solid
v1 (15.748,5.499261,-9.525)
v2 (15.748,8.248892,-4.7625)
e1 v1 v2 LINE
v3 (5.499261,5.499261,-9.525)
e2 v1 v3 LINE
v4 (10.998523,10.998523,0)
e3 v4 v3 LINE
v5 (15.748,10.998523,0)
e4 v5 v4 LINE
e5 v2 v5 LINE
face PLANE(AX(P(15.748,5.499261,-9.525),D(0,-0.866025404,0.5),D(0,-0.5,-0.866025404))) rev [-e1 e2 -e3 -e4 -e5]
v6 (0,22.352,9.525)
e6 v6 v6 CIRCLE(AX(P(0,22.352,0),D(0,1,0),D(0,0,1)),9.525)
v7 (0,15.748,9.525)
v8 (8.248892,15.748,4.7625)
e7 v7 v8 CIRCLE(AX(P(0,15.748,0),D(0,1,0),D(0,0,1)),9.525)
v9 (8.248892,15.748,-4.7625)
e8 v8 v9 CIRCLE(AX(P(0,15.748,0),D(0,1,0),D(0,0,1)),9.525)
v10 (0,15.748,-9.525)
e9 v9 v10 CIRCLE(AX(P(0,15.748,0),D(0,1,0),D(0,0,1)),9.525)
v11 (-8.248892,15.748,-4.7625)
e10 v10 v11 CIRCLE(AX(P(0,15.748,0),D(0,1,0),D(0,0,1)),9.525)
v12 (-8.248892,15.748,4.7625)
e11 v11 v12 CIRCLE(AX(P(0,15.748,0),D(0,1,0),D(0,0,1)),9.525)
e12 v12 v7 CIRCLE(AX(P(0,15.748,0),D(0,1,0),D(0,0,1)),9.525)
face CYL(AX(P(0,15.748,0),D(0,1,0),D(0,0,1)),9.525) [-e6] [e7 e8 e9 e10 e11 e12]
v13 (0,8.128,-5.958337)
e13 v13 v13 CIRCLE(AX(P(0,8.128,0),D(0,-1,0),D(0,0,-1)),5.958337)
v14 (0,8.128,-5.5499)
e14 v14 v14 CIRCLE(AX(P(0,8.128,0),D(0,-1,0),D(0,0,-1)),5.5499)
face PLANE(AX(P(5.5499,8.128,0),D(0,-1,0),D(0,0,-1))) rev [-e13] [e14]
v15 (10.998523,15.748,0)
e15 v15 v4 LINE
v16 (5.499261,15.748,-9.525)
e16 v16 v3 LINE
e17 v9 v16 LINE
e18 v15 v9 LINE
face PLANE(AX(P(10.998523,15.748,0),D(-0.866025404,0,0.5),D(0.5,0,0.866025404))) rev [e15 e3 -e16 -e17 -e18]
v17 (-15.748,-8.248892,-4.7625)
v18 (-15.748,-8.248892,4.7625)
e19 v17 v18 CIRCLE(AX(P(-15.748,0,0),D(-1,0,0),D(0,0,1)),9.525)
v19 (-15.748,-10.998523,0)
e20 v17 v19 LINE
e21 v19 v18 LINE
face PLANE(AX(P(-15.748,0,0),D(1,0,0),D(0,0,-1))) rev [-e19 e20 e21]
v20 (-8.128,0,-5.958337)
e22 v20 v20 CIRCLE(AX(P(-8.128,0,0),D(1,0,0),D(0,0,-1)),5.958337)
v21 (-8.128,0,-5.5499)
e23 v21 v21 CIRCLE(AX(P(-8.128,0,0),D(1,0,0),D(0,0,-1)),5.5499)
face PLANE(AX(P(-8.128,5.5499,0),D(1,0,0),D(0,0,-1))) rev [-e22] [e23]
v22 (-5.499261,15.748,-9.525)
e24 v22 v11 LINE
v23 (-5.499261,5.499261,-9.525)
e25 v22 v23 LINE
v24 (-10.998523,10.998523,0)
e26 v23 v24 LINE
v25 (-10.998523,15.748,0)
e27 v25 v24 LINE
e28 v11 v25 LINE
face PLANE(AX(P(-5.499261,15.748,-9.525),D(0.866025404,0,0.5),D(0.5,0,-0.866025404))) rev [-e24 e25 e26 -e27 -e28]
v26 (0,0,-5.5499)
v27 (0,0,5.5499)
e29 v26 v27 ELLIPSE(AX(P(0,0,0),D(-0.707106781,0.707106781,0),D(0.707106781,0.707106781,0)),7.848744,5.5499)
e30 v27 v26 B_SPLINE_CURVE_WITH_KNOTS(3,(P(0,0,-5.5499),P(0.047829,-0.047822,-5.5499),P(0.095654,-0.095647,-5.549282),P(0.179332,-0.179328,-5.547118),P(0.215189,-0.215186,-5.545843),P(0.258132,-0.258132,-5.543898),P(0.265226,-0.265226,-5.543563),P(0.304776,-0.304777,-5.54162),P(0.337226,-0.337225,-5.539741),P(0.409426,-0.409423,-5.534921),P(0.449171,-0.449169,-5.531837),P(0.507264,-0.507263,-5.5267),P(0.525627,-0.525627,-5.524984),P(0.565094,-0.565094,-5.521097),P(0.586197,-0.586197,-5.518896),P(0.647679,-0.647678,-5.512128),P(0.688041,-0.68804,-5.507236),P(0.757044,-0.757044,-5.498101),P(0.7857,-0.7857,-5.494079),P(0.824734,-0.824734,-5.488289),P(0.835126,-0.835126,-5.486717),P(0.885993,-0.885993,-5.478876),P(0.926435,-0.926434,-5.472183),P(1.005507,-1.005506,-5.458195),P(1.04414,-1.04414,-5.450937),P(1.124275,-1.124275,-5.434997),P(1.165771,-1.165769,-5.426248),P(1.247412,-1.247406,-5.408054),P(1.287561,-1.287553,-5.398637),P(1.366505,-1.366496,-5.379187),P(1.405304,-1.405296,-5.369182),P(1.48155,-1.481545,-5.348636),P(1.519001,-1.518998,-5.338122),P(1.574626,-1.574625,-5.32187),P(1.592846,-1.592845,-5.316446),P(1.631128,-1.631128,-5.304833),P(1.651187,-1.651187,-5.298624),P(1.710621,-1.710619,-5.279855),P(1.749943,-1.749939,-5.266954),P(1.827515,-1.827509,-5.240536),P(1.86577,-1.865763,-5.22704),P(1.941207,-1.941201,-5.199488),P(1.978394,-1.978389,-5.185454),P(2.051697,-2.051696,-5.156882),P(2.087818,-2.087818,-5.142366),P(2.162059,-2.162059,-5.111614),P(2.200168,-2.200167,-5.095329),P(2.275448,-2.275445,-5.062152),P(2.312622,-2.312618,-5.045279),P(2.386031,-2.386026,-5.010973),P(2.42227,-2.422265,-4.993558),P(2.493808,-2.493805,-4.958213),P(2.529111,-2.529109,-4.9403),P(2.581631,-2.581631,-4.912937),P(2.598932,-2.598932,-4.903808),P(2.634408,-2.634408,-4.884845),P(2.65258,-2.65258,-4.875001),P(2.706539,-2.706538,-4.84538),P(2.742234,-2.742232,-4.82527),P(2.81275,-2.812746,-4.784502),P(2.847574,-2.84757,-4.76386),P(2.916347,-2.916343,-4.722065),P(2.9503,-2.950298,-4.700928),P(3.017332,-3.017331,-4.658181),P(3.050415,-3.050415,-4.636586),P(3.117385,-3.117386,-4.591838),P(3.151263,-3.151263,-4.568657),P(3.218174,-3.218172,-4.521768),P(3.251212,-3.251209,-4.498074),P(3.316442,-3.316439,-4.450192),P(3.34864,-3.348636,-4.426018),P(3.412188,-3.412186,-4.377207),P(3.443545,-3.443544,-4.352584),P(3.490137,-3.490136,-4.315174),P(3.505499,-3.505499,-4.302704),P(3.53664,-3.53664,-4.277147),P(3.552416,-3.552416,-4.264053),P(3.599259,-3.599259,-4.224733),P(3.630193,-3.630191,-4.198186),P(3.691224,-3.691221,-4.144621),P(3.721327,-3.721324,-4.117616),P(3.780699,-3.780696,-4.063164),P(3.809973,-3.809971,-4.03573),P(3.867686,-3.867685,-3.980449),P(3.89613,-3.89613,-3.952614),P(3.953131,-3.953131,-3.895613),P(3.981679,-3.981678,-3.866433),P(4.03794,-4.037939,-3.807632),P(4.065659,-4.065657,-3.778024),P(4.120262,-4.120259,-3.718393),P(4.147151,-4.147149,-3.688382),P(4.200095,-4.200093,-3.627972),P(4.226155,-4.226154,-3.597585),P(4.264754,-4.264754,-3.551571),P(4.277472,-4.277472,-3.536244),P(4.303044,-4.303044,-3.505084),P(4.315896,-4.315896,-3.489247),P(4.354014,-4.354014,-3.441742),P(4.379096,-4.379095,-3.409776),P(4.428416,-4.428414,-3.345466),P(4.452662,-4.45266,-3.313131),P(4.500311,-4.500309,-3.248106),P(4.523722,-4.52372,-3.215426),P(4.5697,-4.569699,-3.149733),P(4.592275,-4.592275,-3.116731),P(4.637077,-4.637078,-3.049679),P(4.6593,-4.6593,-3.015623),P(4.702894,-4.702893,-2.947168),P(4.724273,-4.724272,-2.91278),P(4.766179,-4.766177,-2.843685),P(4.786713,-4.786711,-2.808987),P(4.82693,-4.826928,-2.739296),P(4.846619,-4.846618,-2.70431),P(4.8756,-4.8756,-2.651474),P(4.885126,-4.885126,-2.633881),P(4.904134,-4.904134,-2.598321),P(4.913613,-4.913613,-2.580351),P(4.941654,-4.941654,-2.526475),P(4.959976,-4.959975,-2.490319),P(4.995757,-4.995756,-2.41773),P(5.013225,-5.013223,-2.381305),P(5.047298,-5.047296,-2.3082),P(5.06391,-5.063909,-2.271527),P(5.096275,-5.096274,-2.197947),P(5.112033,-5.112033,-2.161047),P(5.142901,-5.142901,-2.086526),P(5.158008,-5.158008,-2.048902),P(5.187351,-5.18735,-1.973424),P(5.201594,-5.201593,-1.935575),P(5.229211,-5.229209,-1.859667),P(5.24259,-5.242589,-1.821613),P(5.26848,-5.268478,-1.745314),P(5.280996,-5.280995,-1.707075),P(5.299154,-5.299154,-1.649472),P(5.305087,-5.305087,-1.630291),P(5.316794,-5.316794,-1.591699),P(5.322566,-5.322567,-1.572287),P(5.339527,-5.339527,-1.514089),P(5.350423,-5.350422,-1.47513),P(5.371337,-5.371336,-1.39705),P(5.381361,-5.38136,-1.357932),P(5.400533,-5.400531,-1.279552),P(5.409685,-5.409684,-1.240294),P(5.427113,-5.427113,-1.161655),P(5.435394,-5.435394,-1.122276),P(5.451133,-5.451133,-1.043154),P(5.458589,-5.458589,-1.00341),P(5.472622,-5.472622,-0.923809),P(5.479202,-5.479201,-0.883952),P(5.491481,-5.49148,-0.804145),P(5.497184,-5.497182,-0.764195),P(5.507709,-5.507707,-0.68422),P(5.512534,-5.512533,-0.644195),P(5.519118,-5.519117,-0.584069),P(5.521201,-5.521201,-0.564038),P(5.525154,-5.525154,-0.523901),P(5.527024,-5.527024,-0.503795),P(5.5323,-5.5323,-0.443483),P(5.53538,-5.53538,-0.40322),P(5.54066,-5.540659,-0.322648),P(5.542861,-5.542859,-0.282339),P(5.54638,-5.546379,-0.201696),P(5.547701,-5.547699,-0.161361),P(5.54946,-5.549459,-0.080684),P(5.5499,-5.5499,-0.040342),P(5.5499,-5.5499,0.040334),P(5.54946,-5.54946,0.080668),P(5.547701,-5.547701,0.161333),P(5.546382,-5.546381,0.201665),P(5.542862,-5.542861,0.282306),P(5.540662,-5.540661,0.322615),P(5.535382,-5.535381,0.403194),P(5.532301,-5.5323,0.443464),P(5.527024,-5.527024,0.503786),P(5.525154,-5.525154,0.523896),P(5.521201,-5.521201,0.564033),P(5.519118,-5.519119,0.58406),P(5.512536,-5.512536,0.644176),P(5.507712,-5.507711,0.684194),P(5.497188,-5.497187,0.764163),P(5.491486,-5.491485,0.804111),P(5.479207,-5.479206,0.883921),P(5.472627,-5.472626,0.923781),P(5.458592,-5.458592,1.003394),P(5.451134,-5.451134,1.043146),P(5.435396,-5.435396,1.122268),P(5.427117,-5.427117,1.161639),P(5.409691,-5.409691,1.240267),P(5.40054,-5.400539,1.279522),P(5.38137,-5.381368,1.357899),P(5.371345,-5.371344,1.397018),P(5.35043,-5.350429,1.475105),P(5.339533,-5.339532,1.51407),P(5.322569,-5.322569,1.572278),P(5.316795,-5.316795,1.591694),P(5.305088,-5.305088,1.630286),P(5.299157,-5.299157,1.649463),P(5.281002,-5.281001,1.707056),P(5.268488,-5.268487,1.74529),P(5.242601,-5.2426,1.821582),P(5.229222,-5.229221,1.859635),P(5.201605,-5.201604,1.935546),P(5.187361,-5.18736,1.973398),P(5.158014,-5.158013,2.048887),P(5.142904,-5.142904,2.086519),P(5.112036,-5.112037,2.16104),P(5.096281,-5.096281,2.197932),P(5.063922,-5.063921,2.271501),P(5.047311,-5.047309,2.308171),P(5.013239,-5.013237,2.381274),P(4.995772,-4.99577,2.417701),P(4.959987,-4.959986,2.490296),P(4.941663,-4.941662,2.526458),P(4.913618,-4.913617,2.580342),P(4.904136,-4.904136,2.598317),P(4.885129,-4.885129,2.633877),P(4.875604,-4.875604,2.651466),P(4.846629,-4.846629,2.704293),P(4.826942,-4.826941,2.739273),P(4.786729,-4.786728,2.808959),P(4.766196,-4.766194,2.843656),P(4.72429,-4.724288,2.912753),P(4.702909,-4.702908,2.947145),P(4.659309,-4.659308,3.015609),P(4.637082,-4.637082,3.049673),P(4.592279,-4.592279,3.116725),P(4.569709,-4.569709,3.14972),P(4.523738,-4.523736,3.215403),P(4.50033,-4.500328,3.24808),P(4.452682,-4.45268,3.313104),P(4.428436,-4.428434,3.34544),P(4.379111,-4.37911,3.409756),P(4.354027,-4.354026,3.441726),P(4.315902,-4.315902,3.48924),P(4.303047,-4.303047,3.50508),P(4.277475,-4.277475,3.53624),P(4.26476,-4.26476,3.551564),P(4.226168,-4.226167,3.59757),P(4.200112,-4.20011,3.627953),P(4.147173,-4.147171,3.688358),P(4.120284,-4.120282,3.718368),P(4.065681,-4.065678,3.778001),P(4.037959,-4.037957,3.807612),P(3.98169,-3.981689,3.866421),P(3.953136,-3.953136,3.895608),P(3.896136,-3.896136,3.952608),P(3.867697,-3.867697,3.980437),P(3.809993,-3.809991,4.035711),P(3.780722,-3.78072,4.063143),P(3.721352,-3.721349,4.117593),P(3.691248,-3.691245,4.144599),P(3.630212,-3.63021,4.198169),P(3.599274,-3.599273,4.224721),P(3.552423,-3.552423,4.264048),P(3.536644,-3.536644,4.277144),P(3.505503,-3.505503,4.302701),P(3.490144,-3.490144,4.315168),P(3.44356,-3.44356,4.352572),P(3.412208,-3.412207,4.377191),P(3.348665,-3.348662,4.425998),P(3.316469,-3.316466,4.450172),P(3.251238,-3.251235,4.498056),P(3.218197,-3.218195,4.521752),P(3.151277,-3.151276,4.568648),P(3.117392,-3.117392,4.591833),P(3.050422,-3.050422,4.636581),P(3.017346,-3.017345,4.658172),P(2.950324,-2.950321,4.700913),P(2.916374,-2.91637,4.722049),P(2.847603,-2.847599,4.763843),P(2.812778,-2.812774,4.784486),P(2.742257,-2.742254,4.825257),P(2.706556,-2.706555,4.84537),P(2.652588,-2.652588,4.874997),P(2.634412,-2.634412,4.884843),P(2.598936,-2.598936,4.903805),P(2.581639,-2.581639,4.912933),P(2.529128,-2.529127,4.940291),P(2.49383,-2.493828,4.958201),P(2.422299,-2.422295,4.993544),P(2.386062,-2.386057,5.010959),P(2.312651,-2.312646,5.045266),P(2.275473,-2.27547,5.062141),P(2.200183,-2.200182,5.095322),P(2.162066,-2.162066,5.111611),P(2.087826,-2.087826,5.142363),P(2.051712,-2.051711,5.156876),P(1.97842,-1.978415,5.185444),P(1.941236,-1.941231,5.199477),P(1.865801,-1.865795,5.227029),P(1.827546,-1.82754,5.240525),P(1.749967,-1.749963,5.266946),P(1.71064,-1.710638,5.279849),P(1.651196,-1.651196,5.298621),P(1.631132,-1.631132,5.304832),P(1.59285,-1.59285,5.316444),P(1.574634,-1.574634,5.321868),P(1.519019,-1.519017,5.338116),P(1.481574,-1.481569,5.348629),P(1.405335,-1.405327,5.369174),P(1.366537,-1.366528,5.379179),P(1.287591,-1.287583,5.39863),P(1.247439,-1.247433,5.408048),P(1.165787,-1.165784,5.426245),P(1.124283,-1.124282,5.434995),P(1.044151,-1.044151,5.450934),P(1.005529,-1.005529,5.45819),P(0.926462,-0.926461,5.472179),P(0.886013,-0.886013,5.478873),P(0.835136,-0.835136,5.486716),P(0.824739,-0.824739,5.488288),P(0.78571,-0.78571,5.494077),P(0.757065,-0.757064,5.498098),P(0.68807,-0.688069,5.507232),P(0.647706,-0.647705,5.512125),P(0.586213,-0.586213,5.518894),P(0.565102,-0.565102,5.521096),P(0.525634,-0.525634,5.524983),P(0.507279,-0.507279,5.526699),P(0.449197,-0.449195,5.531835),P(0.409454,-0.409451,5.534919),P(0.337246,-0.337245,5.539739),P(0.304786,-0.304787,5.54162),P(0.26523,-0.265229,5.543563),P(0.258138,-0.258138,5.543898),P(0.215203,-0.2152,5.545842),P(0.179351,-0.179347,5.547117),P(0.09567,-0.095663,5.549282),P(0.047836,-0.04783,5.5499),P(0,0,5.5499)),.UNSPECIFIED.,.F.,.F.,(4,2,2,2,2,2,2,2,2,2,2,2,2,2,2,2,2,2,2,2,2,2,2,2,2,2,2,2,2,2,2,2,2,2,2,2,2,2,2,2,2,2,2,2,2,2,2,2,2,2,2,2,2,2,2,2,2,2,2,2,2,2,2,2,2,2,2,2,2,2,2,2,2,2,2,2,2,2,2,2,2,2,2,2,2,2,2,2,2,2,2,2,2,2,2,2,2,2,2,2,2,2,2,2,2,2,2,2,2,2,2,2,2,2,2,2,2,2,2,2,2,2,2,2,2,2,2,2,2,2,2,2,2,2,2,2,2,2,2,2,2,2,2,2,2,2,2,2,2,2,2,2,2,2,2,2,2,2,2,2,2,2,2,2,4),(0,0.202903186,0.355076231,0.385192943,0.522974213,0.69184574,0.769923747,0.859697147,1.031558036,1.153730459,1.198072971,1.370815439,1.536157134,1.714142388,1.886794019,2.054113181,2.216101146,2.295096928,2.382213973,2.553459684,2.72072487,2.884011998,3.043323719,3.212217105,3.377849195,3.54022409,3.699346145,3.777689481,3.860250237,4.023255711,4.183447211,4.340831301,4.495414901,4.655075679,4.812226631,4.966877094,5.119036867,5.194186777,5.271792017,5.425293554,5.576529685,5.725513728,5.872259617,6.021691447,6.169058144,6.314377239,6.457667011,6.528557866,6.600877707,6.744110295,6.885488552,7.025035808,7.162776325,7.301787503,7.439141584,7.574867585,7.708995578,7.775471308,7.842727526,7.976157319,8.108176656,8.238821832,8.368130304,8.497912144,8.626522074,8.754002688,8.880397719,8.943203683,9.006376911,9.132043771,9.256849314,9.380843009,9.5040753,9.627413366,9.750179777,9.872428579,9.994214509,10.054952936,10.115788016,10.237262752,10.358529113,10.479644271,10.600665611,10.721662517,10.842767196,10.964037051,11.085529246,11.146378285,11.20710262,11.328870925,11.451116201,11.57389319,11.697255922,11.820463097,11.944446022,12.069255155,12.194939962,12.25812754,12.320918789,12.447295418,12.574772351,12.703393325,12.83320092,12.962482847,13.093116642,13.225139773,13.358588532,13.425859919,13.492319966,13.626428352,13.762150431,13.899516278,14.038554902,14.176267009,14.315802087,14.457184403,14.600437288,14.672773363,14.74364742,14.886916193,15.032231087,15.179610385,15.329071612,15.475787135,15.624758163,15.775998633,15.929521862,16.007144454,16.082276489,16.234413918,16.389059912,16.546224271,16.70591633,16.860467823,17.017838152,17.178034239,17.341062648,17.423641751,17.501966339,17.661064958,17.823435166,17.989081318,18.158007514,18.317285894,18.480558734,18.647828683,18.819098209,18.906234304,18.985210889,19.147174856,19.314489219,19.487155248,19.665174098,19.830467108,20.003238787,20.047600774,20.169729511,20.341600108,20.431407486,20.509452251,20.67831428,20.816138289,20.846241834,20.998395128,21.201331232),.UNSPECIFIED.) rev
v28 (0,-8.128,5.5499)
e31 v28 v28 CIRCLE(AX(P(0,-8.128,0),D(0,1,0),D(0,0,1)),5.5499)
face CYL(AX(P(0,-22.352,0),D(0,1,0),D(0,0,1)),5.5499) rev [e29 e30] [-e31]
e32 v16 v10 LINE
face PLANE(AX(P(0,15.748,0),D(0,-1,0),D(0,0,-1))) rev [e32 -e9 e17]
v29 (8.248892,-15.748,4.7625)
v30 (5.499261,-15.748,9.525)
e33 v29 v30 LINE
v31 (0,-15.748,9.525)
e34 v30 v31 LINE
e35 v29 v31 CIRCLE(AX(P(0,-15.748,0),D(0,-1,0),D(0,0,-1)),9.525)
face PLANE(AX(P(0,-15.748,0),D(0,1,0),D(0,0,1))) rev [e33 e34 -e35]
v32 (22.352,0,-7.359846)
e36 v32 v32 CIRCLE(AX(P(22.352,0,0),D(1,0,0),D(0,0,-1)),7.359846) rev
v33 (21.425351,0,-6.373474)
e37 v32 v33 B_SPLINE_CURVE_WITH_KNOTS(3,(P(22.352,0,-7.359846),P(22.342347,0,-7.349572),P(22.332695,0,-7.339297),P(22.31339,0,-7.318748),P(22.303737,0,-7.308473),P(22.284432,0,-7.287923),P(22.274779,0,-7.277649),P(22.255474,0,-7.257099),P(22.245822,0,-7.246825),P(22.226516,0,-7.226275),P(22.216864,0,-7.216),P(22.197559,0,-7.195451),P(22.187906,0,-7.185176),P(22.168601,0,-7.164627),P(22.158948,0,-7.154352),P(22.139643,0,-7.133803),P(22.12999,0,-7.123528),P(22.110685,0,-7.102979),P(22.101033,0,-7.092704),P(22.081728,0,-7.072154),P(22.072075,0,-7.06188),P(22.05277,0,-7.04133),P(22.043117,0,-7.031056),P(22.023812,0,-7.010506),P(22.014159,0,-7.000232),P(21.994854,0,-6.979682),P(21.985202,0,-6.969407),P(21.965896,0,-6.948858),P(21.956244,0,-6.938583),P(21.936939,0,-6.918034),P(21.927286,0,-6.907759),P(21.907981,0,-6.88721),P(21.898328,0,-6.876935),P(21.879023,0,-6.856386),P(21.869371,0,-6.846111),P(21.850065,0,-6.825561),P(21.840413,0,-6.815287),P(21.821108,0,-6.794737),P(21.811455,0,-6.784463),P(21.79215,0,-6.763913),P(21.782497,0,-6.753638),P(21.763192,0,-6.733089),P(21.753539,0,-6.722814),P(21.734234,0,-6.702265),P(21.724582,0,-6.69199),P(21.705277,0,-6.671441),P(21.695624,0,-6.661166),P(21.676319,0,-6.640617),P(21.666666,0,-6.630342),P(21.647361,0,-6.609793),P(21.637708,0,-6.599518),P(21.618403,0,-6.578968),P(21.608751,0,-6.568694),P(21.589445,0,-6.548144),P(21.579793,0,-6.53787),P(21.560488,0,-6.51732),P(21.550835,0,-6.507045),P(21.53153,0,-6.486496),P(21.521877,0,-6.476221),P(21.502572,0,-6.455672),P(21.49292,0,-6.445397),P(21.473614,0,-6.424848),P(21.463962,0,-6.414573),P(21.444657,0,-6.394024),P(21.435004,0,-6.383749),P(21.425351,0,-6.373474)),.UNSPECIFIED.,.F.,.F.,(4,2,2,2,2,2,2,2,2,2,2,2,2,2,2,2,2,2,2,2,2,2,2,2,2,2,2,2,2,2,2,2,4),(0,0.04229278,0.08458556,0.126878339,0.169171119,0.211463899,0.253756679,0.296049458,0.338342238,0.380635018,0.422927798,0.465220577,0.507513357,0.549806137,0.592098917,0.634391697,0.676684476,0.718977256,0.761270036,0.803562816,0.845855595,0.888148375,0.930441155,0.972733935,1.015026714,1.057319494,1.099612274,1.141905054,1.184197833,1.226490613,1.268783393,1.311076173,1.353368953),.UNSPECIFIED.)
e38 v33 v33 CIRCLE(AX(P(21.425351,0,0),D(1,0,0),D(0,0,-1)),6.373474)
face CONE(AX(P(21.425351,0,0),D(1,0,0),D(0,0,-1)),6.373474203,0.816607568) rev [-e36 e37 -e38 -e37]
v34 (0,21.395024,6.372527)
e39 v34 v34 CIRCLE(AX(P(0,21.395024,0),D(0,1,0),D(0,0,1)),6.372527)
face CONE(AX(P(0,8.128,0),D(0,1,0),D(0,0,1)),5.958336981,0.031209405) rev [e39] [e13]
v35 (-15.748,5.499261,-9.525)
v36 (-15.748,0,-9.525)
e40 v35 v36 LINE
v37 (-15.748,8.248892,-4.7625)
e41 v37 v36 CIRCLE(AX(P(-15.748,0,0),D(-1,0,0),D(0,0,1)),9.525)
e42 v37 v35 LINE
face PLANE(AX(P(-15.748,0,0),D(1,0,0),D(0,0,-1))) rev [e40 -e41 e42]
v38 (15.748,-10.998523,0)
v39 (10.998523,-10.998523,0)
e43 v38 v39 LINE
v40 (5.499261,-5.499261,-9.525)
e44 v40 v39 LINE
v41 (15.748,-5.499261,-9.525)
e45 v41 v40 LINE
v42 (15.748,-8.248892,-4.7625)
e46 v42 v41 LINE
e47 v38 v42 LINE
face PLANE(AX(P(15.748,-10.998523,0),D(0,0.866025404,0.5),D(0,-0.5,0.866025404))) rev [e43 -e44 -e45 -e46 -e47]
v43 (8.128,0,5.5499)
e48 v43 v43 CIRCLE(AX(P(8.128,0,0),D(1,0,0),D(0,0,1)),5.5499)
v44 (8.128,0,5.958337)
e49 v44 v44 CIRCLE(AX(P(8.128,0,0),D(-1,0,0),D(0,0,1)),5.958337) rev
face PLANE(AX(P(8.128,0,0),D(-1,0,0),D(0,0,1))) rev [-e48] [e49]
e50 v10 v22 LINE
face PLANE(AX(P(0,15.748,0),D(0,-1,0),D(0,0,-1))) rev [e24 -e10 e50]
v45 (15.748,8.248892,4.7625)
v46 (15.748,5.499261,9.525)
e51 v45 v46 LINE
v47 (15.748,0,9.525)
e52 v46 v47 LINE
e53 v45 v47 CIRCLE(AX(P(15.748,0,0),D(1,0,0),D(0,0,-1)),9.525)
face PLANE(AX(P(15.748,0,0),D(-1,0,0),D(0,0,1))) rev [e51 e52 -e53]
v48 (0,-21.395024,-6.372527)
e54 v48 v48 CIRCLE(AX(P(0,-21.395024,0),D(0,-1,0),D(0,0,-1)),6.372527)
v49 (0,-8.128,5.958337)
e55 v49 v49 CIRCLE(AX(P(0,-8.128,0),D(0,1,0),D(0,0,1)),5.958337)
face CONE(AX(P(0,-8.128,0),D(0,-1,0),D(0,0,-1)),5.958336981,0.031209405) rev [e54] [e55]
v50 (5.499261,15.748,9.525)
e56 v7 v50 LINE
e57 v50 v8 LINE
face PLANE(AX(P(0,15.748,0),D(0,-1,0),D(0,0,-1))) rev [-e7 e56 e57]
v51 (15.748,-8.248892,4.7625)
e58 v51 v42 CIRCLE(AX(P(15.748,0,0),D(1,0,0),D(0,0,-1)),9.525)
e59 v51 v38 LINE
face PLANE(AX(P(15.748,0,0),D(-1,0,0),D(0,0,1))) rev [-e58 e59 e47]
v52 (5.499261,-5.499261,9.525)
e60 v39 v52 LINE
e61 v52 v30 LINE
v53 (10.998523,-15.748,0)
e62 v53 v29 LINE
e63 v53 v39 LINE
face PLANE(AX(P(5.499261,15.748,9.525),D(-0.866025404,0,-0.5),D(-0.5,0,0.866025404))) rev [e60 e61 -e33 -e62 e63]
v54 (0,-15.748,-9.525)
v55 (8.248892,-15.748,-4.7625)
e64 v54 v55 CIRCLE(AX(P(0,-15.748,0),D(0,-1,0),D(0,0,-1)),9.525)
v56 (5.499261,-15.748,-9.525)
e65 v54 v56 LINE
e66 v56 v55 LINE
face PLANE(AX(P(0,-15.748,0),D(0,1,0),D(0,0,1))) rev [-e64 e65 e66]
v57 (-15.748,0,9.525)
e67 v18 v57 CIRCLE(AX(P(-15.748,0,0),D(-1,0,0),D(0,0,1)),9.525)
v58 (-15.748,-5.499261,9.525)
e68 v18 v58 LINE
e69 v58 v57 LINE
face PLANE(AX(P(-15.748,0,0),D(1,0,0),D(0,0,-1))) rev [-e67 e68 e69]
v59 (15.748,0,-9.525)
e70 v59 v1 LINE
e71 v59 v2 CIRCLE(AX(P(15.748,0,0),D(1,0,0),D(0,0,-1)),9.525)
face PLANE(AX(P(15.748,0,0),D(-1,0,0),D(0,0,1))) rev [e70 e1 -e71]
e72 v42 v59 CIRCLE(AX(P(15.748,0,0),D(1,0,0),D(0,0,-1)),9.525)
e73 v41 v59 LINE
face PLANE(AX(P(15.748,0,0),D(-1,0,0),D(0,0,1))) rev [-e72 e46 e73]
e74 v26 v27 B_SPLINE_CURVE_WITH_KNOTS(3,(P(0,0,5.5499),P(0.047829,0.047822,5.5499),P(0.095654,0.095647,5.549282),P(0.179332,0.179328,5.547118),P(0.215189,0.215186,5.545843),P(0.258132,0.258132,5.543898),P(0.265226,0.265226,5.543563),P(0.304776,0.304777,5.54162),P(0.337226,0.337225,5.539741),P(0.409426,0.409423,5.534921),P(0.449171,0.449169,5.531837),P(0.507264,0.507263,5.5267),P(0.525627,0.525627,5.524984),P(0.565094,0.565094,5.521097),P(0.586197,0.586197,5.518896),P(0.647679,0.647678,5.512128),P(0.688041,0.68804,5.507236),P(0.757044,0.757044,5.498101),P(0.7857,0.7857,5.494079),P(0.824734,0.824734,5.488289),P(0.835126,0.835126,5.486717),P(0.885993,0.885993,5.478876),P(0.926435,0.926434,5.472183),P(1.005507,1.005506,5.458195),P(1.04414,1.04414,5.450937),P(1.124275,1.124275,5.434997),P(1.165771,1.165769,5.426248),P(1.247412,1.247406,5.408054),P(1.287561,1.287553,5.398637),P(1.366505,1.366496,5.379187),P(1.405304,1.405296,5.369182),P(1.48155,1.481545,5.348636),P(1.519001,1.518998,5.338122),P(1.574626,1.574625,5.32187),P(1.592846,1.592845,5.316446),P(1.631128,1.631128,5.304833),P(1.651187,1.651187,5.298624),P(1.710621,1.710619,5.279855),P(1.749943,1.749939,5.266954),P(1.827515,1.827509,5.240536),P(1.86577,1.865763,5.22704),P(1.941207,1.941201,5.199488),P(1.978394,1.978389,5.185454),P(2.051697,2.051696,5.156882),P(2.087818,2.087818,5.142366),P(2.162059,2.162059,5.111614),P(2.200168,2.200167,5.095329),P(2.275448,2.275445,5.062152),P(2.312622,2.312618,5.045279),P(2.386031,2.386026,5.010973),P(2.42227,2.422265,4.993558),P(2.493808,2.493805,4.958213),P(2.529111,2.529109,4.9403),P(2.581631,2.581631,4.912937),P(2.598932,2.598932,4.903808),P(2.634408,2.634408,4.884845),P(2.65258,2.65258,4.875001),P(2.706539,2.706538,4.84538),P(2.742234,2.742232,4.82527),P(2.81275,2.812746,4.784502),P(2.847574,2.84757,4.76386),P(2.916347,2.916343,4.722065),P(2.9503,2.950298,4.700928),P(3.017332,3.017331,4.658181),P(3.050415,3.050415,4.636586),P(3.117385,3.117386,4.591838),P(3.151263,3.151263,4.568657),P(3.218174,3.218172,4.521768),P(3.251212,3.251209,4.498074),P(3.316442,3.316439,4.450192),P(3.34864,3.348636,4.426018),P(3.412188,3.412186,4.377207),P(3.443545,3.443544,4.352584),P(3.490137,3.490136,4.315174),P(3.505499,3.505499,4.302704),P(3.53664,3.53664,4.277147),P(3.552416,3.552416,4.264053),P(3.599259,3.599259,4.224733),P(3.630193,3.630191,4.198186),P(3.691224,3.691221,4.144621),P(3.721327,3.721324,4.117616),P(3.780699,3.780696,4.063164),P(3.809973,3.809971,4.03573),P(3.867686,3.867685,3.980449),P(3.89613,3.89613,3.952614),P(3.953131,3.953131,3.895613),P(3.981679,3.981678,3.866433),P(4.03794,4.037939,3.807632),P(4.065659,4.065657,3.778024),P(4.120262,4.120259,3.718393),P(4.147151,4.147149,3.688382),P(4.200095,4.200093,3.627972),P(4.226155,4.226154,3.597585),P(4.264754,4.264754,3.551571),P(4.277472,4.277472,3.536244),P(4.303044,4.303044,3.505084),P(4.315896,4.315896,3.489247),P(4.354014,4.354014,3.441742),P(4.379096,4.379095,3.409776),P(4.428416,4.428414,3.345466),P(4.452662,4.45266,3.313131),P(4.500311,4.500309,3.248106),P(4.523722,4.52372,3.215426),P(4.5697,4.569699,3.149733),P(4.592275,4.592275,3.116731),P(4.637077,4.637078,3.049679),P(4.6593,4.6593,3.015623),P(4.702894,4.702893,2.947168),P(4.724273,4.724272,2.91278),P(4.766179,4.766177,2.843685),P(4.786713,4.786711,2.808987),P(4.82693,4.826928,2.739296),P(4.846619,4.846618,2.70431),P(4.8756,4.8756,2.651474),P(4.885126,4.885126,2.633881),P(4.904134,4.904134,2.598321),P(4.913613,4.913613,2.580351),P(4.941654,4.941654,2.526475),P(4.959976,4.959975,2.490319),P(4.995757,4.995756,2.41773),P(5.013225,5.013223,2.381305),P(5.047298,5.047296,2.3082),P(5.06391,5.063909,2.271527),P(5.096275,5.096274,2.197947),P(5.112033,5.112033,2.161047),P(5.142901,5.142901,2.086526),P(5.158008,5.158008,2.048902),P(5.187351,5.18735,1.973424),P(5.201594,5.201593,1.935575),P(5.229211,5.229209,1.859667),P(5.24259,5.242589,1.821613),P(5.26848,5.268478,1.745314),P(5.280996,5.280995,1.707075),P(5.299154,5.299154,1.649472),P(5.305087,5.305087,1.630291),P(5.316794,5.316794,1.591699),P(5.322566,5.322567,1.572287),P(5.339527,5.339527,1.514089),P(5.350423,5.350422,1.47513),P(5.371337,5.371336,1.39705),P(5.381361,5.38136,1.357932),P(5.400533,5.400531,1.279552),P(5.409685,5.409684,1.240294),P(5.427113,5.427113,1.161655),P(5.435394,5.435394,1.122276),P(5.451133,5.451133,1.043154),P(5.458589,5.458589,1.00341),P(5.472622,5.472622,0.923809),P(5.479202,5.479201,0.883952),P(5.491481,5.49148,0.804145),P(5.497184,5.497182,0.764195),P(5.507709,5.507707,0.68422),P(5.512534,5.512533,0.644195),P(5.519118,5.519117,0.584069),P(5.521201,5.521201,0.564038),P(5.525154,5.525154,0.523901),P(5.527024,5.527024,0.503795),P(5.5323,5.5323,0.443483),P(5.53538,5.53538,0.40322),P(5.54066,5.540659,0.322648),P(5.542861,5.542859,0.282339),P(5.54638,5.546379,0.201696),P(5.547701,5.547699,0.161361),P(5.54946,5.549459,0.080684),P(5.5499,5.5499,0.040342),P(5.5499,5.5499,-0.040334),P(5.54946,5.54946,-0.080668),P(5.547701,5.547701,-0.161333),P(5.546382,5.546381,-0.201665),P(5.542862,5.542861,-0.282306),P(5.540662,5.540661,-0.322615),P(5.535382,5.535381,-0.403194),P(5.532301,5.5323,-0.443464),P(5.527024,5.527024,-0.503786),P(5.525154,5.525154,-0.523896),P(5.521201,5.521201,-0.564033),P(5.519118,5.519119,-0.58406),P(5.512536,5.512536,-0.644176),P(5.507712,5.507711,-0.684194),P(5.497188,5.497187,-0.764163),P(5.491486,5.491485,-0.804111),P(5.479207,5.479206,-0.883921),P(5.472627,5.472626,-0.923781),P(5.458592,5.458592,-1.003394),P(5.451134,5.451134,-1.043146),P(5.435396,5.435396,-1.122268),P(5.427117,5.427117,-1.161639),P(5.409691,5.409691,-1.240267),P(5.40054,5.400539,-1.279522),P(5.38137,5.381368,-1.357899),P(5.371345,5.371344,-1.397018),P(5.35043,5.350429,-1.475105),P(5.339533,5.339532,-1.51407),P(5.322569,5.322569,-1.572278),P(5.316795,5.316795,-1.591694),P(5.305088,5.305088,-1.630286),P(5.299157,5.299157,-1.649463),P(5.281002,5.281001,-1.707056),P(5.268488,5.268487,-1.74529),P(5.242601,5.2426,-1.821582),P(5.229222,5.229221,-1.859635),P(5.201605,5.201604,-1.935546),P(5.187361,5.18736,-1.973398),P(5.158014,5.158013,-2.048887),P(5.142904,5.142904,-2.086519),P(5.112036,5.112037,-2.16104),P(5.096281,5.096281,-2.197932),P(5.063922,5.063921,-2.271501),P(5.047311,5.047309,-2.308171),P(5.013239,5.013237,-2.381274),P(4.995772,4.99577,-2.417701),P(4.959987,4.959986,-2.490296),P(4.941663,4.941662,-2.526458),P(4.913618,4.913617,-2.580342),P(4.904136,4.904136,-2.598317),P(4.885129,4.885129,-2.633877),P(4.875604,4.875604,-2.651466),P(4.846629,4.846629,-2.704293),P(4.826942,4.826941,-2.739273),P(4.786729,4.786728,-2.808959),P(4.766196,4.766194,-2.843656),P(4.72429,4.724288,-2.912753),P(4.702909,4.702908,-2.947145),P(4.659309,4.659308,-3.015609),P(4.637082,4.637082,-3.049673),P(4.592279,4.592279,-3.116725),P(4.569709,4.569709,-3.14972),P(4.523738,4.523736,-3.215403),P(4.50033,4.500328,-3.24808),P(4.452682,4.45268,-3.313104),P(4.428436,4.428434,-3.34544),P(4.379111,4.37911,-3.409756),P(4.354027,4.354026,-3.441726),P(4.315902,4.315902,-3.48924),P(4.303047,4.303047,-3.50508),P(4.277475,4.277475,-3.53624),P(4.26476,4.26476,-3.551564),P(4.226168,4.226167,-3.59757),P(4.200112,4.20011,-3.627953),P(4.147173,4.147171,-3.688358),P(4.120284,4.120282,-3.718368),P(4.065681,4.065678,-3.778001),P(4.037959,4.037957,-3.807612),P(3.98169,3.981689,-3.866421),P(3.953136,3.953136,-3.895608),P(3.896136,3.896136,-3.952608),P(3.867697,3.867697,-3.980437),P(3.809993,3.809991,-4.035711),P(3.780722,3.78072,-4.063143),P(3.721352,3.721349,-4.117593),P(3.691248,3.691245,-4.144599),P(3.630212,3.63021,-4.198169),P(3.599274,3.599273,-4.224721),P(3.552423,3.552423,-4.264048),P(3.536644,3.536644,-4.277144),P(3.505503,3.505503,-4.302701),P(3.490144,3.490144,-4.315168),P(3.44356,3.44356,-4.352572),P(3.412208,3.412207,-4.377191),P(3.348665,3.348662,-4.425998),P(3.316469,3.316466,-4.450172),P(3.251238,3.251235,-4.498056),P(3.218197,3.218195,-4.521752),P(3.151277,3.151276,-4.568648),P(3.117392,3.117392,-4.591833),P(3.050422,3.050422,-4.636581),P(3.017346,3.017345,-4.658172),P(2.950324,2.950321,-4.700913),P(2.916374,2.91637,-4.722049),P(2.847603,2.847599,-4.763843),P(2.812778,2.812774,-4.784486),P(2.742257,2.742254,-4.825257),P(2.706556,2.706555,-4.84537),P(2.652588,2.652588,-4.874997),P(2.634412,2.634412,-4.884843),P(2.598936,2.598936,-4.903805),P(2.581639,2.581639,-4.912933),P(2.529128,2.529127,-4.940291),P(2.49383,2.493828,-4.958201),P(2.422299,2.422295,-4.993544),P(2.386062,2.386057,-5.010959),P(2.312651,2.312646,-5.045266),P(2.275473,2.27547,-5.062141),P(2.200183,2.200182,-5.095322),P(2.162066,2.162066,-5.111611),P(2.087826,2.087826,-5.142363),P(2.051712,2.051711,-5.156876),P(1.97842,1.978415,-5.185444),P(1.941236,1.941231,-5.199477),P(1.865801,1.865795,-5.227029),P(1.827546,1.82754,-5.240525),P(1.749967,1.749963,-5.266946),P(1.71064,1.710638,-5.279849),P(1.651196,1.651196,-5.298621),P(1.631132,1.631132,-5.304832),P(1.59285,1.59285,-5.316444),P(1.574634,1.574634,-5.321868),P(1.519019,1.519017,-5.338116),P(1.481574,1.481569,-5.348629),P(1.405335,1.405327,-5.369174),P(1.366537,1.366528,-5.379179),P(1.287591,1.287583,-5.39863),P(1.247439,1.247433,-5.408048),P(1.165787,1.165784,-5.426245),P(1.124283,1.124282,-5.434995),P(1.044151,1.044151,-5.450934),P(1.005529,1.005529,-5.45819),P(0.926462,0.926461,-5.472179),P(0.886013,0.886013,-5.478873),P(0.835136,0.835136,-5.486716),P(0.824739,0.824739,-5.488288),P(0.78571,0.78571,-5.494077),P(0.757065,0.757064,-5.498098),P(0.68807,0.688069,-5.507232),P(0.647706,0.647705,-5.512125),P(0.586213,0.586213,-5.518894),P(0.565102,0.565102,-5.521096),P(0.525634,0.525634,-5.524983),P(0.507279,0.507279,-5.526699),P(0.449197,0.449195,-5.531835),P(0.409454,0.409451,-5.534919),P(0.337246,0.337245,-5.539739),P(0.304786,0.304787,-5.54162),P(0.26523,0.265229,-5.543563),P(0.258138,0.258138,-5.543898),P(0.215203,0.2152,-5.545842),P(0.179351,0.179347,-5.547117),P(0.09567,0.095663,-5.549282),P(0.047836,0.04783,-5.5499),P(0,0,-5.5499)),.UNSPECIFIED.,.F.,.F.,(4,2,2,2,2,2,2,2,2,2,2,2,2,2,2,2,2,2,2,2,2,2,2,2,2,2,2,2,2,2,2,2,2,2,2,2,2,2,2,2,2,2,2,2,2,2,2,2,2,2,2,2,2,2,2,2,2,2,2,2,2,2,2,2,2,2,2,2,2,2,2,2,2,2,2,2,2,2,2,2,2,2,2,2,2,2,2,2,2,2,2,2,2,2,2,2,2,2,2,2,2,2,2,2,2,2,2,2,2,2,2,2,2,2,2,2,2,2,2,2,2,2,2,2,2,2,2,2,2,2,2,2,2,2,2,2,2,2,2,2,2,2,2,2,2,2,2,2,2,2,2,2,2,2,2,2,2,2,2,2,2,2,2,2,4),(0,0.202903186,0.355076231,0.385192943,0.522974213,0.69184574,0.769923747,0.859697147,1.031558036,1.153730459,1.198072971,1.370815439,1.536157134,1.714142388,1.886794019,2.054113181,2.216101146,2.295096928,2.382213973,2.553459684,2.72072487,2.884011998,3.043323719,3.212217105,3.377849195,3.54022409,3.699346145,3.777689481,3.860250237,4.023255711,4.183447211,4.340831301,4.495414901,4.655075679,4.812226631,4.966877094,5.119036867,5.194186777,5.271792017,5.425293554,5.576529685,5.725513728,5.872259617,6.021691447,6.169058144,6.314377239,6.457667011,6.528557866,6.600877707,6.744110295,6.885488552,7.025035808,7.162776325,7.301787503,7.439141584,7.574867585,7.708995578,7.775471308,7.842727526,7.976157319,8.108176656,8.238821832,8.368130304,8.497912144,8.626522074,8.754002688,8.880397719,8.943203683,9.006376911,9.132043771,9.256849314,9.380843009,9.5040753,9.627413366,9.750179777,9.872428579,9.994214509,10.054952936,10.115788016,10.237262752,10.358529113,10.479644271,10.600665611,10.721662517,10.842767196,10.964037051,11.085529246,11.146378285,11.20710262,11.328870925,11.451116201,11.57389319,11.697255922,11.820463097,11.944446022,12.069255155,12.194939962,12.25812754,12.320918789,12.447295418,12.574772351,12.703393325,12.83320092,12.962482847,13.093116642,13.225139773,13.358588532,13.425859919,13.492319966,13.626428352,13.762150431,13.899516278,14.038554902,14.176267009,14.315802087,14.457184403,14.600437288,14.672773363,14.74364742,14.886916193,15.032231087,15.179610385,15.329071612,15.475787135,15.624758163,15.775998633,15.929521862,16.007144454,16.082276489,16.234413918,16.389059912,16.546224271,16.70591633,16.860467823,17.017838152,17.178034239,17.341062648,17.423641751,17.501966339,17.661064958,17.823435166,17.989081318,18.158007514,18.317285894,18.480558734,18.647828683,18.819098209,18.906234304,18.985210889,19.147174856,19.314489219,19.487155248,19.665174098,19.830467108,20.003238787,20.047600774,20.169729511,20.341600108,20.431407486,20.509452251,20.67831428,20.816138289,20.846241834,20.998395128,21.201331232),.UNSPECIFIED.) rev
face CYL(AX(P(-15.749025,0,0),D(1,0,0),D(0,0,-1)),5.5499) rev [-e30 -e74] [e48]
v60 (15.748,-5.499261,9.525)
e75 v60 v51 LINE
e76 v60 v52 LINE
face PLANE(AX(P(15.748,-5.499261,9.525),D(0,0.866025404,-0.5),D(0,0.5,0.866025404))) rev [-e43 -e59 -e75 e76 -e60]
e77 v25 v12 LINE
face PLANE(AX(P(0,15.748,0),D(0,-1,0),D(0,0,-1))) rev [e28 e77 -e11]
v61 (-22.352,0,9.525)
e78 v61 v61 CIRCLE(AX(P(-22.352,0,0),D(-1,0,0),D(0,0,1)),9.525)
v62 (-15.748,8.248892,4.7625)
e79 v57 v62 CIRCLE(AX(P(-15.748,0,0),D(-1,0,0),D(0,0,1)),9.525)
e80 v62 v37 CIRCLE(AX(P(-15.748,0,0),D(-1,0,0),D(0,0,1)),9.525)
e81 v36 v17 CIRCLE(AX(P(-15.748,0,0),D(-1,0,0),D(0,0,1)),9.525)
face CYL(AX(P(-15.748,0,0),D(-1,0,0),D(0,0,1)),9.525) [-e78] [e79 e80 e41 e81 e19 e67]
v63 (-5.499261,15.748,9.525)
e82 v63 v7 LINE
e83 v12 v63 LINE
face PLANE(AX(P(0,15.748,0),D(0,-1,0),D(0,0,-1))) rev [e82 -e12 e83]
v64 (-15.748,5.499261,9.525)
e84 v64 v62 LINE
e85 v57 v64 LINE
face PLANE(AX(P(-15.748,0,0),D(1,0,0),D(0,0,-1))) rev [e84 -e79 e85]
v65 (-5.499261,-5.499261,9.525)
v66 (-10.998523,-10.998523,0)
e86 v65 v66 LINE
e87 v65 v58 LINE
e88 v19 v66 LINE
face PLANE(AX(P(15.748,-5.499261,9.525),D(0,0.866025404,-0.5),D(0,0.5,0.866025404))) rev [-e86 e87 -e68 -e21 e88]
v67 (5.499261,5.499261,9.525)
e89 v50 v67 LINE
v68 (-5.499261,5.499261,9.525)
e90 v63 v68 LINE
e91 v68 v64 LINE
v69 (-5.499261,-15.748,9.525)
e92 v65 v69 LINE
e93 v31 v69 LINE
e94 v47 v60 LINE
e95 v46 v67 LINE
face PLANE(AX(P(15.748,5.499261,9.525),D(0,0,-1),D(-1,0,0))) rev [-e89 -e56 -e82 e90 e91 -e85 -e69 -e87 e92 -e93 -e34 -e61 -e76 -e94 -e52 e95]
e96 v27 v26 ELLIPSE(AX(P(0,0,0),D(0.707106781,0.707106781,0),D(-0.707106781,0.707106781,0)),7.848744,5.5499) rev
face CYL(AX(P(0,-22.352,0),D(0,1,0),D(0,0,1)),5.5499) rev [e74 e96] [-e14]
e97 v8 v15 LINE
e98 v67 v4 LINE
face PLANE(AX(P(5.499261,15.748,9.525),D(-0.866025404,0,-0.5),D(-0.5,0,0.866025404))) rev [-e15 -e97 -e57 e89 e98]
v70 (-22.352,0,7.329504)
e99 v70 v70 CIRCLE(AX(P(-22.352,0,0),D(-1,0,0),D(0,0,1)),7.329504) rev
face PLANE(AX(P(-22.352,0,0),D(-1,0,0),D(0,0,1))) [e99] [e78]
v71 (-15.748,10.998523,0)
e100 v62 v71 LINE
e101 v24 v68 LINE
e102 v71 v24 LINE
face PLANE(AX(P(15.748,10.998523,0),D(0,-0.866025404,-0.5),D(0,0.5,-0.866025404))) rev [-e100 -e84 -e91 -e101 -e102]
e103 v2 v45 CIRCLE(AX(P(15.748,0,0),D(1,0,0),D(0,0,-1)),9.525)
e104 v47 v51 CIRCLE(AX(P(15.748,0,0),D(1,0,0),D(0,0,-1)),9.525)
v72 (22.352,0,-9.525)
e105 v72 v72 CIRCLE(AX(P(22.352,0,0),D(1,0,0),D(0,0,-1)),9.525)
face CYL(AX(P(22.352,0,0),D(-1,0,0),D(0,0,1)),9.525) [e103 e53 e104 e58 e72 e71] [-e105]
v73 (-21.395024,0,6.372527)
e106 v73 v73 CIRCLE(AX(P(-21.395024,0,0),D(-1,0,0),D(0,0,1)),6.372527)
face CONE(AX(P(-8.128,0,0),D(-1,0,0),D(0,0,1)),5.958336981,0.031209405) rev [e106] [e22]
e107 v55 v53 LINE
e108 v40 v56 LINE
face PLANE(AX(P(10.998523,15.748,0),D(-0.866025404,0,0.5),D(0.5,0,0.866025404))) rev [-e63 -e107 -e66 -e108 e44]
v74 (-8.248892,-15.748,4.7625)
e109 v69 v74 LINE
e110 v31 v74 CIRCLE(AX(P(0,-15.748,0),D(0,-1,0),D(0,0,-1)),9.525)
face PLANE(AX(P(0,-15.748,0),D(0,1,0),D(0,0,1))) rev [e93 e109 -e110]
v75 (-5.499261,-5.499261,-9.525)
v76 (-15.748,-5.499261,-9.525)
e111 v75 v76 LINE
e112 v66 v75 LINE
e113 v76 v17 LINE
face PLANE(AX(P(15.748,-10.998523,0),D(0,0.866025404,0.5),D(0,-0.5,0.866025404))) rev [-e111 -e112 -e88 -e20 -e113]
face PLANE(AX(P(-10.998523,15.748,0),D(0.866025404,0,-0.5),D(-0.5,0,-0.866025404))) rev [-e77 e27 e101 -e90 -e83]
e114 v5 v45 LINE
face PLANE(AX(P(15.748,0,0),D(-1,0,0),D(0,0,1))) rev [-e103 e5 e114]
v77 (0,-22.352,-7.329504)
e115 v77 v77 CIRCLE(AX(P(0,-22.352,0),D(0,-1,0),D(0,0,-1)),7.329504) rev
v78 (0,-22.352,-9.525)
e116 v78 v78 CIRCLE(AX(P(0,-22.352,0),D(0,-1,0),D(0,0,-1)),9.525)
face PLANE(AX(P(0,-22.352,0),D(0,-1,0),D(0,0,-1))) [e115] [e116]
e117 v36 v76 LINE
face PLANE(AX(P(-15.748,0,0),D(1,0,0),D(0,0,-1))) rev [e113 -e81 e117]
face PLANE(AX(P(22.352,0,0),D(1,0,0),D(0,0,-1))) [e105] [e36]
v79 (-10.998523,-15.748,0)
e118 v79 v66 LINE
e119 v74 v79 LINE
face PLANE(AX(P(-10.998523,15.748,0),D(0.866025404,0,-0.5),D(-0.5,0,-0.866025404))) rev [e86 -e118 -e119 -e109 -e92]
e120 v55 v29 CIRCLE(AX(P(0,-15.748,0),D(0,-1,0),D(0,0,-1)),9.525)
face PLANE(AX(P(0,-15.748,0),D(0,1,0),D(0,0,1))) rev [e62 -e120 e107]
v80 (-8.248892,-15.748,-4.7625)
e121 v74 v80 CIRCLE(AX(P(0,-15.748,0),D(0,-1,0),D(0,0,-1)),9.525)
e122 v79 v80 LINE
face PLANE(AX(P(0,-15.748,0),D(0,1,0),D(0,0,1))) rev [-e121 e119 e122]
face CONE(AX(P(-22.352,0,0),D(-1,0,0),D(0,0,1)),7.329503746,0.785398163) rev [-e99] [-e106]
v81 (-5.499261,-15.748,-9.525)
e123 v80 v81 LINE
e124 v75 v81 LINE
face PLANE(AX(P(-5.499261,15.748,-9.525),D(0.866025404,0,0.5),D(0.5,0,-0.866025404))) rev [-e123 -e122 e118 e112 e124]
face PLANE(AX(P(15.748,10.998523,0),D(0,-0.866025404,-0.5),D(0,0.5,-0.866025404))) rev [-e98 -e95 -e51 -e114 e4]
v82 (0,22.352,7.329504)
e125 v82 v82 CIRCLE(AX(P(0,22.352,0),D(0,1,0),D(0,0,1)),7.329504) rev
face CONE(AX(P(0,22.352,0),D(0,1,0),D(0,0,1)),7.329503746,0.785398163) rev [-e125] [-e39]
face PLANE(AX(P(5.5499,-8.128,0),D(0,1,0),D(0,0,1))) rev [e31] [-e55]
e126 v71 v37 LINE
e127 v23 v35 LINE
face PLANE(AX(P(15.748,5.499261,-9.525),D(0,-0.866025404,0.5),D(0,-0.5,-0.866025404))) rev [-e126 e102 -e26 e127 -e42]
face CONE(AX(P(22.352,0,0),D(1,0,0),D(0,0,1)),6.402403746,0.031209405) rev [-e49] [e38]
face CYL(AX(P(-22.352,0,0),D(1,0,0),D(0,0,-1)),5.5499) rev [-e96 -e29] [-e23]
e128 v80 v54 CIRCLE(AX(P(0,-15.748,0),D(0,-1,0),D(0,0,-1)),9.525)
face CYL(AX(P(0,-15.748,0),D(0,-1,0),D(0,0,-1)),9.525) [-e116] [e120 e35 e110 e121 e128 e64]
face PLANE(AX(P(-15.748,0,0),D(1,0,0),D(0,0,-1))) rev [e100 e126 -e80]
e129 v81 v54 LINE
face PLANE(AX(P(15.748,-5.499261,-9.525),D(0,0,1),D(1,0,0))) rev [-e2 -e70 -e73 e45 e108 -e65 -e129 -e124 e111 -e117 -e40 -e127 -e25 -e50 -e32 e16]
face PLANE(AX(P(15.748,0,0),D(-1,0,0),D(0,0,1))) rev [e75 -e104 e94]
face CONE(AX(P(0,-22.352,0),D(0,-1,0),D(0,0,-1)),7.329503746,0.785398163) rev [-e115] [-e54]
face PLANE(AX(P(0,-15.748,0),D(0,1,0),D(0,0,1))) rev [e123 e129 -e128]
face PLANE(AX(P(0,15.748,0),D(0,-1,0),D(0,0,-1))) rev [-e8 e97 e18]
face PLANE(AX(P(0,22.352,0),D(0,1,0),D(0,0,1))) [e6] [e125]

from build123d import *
from OCP.BRepFilletAPI import BRepFilletAPI_MakeChamfer

# Parameters (mm, degrees)
BOSS_EXTRUDE1_START     = -21.997045256
BOSS_EXTRUDE1_DEPTH     = 26.746522628
BOSS_EXTRUDE1_START_2   = -16.497783942
BOSS_EXTRUDE1_2_DEPTH   = 10.998522628
BOSS_EXTRUDE1_START_3   = -10.998522628
BOSS_EXTRUDE1_3_DEPTH   = 21.997045256
BOSS_EXTRUDE2_DEPTH     = 4.749477372
BOSS_EXTRUDE3_DEPTH     = 4.749477372
BOSS_EXTRUDE4_DEPTH     = 4.749477372
SKETCH5_R               = 9.525
BOSS_EXTRUDE5_DEPTH     = 6.604
SKETCH10_R              = 6.402403746
CUT_EXTRUDE2_DEPTH      = 14.224
CUT_EXTRUDE2_DRAFT      = -1.788167188
CUT_EXTRUDE3_REACH      = 32.146
CUT_EXTRUDE3_END_RADIUS = 5.5499
SKETCH11_R              = 5.5499
SKETCH12_W              = 6.604
SKETCH12_H              = 9.525
SKETCH13_W              = 9.525
SKETCH13_H              = 6.604
SKETCH14_W              = 9.525
SKETCH14_H              = 6.604
CHAMFER1_SIZE           = 0.9271
CHAMFER1_SIZE2          = 0.957442613


with BuildPart() as part:
    # Boss-Extrude1: read off the stored shape, not the designer's step
    # Boss-Extrude1 outline → Boss-Extrude1 (new body)
    with BuildSketch(Plane.ZY.offset(10.998522628).offset(BOSS_EXTRUDE1_START)):
        Polygon((-9.525, 5.499261314), (-9.525, -5.499261314), (0, -10.998522628), (9.525, -5.499261314), (9.525, 5.499261314), (0, 10.998522628), align=None)
    extrude(amount=BOSS_EXTRUDE1_DEPTH)

    # Boss-Extrude1 2 outline → Boss-Extrude1 2 (add)
    with BuildSketch(Plane.ZY.offset(10.998522628).offset(BOSS_EXTRUDE1_START_2)):
        Polygon((-9.525, -5.499261314), (-9.525, -10.998522628), (0, -10.998522628), align=None)
        Polygon((9.525, -5.499261314), (0, -10.998522628), (9.525, -10.998522628), align=None)
        Polygon((-9.525, 10.998522628), (-9.525, 5.499261314), (0, 10.998522628), align=None)
        Polygon((9.525, 10.998522628), (0, 10.998522628), (9.525, 5.499261314), align=None)
    extrude(amount=BOSS_EXTRUDE1_2_DEPTH)

    # Boss-Extrude1 3 outline → Boss-Extrude1 3 (add)
    with BuildSketch(Plane(origin=(0, 0, 0), x_dir=(1, 0, 0), z_dir=(0, 1, 0)).offset(BOSS_EXTRUDE1_START_3)):
        Polygon((10.998522628, 0), (5.499261314, 9.525), (5.499261314, -9.525), align=None)
        Polygon((-10.998522628, 0), (-5.499261314, -9.525), (-5.499261314, 9.525), align=None)
    extrude(amount=BOSS_EXTRUDE1_3_DEPTH)

    # Sketch2 → Boss-Extrude2 (add)
    with BuildSketch(Plane.XZ.offset(10.998522628)):
        Polygon((-5.499261314, -9.525), (-10.998522628, 0), (-5.499261314, 9.525), (5.499261314, 9.525), (10.998522628, 0), (5.499261314, -9.525), align=None)
    extrude(amount=BOSS_EXTRUDE2_DEPTH)

    # Sketch3 → Boss-Extrude3 (add)
    with BuildSketch(Plane(origin=(0, 10.998522628, 0), x_dir=(-1, 0, 0), z_dir=(0, 1, 0))):
        Polygon((-5.499261314, 9.525), (5.499261314, 9.525), (10.998522628, 0), (5.499261314, -9.525), (-5.499261314, -9.525), (-10.998522628, 0), align=None)
    extrude(amount=BOSS_EXTRUDE3_DEPTH)

    # Sketch4 → Boss-Extrude4 (add)
    with BuildSketch(Plane(origin=(10.998522628, 0, 0), x_dir=(0, 0, -1), z_dir=(1, 0, 0))):
        Polygon((0, 10.998522628), (9.525, 5.499261314), (9.525, -5.499261314), (0, -10.998522628), (-9.525, -5.499261314), (-9.525, 5.499261314), align=None)
    extrude(amount=BOSS_EXTRUDE4_DEPTH)

    # Sketch5 → Boss-Extrude5 (add)
    with BuildSketch(Plane(origin=(15.748, 0, 0), x_dir=(0, 0, -1), z_dir=(1, 0, 0))):
        Circle(SKETCH5_R)
    extrude(amount=BOSS_EXTRUDE5_DEPTH)


with BuildPart() as cut_extrude2_tool:
    # Sketch10 → Cut-Extrude2 (with draft: the straight prism first)
    with BuildSketch(Plane(origin=(22.352, 0, 0), x_dir=(0, 0, -1), z_dir=(1, 0, 0))):
        Circle(SKETCH10_R)
    extrude(amount=-CUT_EXTRUDE2_DEPTH)
    # Cut-Extrude2: the draft: its side faces are tilted about the plane it starts from
    cut_extrude2_sides = [cut_extrude2_tool.faces().sort_by_distance(p)[0] for p in [
        (15.24, 0, 6.402403746),
    ]]
    draft(cut_extrude2_sides, Plane(origin=(22.352, 0, 0), x_dir=(0, 0, -1), z_dir=(1, 0, 0)), CUT_EXTRUDE2_DRAFT)


with BuildPart() as part_1:
    add(part.part)

    # Cut-Extrude2: cut by cut_extrude2_tool
    add(cut_extrude2_tool.part, mode=Mode.SUBTRACT)

    # Cut-Extrude3: up to this cylinder (the profile starts outside it)
    cut_extrude3_end = Plane(origin=(0, 0, 0), z_dir=(0, 1, 0)) * Cylinder(CUT_EXTRUDE3_END_RADIUS, 76.3918, mode=Mode.PRIVATE)
    # Sketch11 → Cut-Extrude3 (cut, up to the surface)
    with BuildSketch(Plane(origin=(8.128, 0, 0), x_dir=(0, 0, -1), z_dir=(1, 0, 0)), mode=Mode.PRIVATE) as cut_extrude3_sk1:
        with Locations(Location((0, 0, 0), (0, 0, 180))):
            Circle(SKETCH11_R)
    cut_extrude3_tool1 = extrude(cut_extrude3_sk1.sketch, amount=-CUT_EXTRUDE3_REACH, mode=Mode.PRIVATE) - cut_extrude3_end
    add(cut_extrude3_tool1.solids().sort_by_distance((8.128, 0, 0))[0], mode=Mode.SUBTRACT)

    # Sketch12 → Revolve1 (revolve)
    with BuildSketch(Plane(origin=(0, 0, 0), x_dir=(-1, 0, 0), z_dir=(0, 0, -1)), mode=Mode.PRIVATE) as revolve1_sk:
        with Locations((19.05, 4.7625)):
            Rectangle(SKETCH12_W, SKETCH12_H)
    revolve(revolve1_sk.sketch.rotate(Axis((-15.748, 0, 0), (-1, 0, 0)), 270), axis=Axis((-15.748, 0, 0), (-1, 0, 0)))

    # Sketch13 → Revolve2 (revolve)
    with BuildSketch(Plane.XY, mode=Mode.PRIVATE) as revolve2_sk:
        with Locations((4.7625, -19.05)):
            Rectangle(SKETCH13_W, SKETCH13_H)
    revolve(revolve2_sk.sketch.rotate(Axis((0, -15.748, 0), (0, -1, 0)), 270), axis=Axis((0, -15.748, 0), (0, -1, 0)))

    # Sketch14 → Revolve3 (revolve)
    with BuildSketch(Plane(origin=(0, 0, 0), x_dir=(-1, 0, 0), z_dir=(0, 0, -1)), mode=Mode.PRIVATE) as revolve3_sk:
        with Locations((-4.7625, 19.05)):
            Rectangle(SKETCH14_W, SKETCH14_H)
    revolve(revolve3_sk.sketch.rotate(Axis((0, 15.748, 0), (0, 1, 0)), 270), axis=Axis((0, 15.748, 0), (0, 1, 0)))

    # Sketch15 → Cut-Revolve1 (revolve, cut)
    with BuildSketch(Plane(origin=(0, 0, 0), x_dir=(-1, 0, 0), z_dir=(0, 0, -1)), mode=Mode.PRIVATE) as cut_revolve1_sk:
        Polygon((-6.402403746, -22.352), (0, -22.352), (0, 0), (-5.5499, 0), (-5.5499, -8.128), (-5.958336981, -8.128), align=None)
    revolve(cut_revolve1_sk.sketch.rotate(Axis((0, -22.352, 0), (0, 1, 0)), 270), axis=Axis((0, -22.352, 0), (0, 1, 0)), mode=Mode.SUBTRACT)

    # Sketch16 → Cut-Revolve2 (revolve, cut)
    with BuildSketch(Plane.XY, mode=Mode.PRIVATE) as cut_revolve2_sk:
        Polygon((6.402403746, 22.352), (0, 22.352), (0, 0), (5.5499, 0), (5.5499, 8.128), (5.958336981, 8.128), align=None)
    revolve(cut_revolve2_sk.sketch.rotate(Axis((0, 22.352, 0), (0, -1, 0)), 90), axis=Axis((0, 22.352, 0), (0, -1, 0)), mode=Mode.SUBTRACT)

    # Sketch17 → Cut-Revolve3 (revolve, cut)
    with BuildSketch(Plane.XY, mode=Mode.PRIVATE) as cut_revolve3_sk:
        Polygon((-22.352, 6.402403746), (-22.352, 0), (0, 0), (0, 5.5499), (-8.128, 5.5499), (-8.128, 5.958336981), align=None)
    revolve(cut_revolve3_sk.sketch.rotate(Axis((-22.352, 0, 0), (1, 0, 0)), 270), axis=Axis((-22.352, 0, 0), (1, 0, 0)), mode=Mode.SUBTRACT)

    # Chamfer1: one chamfer whose edges measure the first distance from different faces: ONE call of the kernel's chamfer builder (chamfer() names one face for all edges)
    chamfer1_edges_1 = [part_1.edges().sort_by_distance(p)[0] for p in [
        (22.352, 0, 6.402403746),
    ]]
    chamfer1_side_1 = [part_1.faces().sort_by_distance(p)[0] for p in [
        (15.24, 0, 6.180370364),
    ]]
    chamfer1_edges_2 = [part_1.edges().sort_by_distance(p)[0] for p in [
        (0, -22.352, -6.402403746),
    ]]
    chamfer1_side_2 = [part_1.faces().sort_by_distance(p)[0] for p in [
        (0, -22.352, 9.255592316),
    ]]
    chamfer1_edges_3 = [part_1.edges().sort_by_distance(p)[0] for p in [
        (0, 22.352, -6.402403746),
    ]]
    chamfer1_side_3 = [part_1.faces().sort_by_distance(p)[0] for p in [
        (0, 22.352, -9.255592316),
    ]]
    chamfer1_edges_4 = [part_1.edges().sort_by_distance(p)[0] for p in [
        (-22.352, 0, 6.402403746),
    ]]
    chamfer1_side_4 = [part_1.faces().sort_by_distance(p)[0] for p in [
        (-22.352, 0, -9.255592316),
    ]]
    chamfer1 = BRepFilletAPI_MakeChamfer(part_1.part.solid().wrapped)
    for e in chamfer1_edges_1:
        chamfer1.Add(CHAMFER1_SIZE, CHAMFER1_SIZE2, e.wrapped, chamfer1_side_1[0].wrapped)  # the first distance lies on this face
    for e in chamfer1_edges_2:
        chamfer1.Add(CHAMFER1_SIZE, CHAMFER1_SIZE2, e.wrapped, chamfer1_side_2[0].wrapped)  # the first distance lies on this face
    for e in chamfer1_edges_3:
        chamfer1.Add(CHAMFER1_SIZE, CHAMFER1_SIZE2, e.wrapped, chamfer1_side_3[0].wrapped)  # the first distance lies on this face
    for e in chamfer1_edges_4:
        chamfer1.Add(CHAMFER1_SIZE, CHAMFER1_SIZE2, e.wrapped, chamfer1_side_4[0].wrapped)  # the first distance lies on this face
    add(Compound.cast(chamfer1.Shape()), mode=Mode.REPLACE)


solid = part_1.part
